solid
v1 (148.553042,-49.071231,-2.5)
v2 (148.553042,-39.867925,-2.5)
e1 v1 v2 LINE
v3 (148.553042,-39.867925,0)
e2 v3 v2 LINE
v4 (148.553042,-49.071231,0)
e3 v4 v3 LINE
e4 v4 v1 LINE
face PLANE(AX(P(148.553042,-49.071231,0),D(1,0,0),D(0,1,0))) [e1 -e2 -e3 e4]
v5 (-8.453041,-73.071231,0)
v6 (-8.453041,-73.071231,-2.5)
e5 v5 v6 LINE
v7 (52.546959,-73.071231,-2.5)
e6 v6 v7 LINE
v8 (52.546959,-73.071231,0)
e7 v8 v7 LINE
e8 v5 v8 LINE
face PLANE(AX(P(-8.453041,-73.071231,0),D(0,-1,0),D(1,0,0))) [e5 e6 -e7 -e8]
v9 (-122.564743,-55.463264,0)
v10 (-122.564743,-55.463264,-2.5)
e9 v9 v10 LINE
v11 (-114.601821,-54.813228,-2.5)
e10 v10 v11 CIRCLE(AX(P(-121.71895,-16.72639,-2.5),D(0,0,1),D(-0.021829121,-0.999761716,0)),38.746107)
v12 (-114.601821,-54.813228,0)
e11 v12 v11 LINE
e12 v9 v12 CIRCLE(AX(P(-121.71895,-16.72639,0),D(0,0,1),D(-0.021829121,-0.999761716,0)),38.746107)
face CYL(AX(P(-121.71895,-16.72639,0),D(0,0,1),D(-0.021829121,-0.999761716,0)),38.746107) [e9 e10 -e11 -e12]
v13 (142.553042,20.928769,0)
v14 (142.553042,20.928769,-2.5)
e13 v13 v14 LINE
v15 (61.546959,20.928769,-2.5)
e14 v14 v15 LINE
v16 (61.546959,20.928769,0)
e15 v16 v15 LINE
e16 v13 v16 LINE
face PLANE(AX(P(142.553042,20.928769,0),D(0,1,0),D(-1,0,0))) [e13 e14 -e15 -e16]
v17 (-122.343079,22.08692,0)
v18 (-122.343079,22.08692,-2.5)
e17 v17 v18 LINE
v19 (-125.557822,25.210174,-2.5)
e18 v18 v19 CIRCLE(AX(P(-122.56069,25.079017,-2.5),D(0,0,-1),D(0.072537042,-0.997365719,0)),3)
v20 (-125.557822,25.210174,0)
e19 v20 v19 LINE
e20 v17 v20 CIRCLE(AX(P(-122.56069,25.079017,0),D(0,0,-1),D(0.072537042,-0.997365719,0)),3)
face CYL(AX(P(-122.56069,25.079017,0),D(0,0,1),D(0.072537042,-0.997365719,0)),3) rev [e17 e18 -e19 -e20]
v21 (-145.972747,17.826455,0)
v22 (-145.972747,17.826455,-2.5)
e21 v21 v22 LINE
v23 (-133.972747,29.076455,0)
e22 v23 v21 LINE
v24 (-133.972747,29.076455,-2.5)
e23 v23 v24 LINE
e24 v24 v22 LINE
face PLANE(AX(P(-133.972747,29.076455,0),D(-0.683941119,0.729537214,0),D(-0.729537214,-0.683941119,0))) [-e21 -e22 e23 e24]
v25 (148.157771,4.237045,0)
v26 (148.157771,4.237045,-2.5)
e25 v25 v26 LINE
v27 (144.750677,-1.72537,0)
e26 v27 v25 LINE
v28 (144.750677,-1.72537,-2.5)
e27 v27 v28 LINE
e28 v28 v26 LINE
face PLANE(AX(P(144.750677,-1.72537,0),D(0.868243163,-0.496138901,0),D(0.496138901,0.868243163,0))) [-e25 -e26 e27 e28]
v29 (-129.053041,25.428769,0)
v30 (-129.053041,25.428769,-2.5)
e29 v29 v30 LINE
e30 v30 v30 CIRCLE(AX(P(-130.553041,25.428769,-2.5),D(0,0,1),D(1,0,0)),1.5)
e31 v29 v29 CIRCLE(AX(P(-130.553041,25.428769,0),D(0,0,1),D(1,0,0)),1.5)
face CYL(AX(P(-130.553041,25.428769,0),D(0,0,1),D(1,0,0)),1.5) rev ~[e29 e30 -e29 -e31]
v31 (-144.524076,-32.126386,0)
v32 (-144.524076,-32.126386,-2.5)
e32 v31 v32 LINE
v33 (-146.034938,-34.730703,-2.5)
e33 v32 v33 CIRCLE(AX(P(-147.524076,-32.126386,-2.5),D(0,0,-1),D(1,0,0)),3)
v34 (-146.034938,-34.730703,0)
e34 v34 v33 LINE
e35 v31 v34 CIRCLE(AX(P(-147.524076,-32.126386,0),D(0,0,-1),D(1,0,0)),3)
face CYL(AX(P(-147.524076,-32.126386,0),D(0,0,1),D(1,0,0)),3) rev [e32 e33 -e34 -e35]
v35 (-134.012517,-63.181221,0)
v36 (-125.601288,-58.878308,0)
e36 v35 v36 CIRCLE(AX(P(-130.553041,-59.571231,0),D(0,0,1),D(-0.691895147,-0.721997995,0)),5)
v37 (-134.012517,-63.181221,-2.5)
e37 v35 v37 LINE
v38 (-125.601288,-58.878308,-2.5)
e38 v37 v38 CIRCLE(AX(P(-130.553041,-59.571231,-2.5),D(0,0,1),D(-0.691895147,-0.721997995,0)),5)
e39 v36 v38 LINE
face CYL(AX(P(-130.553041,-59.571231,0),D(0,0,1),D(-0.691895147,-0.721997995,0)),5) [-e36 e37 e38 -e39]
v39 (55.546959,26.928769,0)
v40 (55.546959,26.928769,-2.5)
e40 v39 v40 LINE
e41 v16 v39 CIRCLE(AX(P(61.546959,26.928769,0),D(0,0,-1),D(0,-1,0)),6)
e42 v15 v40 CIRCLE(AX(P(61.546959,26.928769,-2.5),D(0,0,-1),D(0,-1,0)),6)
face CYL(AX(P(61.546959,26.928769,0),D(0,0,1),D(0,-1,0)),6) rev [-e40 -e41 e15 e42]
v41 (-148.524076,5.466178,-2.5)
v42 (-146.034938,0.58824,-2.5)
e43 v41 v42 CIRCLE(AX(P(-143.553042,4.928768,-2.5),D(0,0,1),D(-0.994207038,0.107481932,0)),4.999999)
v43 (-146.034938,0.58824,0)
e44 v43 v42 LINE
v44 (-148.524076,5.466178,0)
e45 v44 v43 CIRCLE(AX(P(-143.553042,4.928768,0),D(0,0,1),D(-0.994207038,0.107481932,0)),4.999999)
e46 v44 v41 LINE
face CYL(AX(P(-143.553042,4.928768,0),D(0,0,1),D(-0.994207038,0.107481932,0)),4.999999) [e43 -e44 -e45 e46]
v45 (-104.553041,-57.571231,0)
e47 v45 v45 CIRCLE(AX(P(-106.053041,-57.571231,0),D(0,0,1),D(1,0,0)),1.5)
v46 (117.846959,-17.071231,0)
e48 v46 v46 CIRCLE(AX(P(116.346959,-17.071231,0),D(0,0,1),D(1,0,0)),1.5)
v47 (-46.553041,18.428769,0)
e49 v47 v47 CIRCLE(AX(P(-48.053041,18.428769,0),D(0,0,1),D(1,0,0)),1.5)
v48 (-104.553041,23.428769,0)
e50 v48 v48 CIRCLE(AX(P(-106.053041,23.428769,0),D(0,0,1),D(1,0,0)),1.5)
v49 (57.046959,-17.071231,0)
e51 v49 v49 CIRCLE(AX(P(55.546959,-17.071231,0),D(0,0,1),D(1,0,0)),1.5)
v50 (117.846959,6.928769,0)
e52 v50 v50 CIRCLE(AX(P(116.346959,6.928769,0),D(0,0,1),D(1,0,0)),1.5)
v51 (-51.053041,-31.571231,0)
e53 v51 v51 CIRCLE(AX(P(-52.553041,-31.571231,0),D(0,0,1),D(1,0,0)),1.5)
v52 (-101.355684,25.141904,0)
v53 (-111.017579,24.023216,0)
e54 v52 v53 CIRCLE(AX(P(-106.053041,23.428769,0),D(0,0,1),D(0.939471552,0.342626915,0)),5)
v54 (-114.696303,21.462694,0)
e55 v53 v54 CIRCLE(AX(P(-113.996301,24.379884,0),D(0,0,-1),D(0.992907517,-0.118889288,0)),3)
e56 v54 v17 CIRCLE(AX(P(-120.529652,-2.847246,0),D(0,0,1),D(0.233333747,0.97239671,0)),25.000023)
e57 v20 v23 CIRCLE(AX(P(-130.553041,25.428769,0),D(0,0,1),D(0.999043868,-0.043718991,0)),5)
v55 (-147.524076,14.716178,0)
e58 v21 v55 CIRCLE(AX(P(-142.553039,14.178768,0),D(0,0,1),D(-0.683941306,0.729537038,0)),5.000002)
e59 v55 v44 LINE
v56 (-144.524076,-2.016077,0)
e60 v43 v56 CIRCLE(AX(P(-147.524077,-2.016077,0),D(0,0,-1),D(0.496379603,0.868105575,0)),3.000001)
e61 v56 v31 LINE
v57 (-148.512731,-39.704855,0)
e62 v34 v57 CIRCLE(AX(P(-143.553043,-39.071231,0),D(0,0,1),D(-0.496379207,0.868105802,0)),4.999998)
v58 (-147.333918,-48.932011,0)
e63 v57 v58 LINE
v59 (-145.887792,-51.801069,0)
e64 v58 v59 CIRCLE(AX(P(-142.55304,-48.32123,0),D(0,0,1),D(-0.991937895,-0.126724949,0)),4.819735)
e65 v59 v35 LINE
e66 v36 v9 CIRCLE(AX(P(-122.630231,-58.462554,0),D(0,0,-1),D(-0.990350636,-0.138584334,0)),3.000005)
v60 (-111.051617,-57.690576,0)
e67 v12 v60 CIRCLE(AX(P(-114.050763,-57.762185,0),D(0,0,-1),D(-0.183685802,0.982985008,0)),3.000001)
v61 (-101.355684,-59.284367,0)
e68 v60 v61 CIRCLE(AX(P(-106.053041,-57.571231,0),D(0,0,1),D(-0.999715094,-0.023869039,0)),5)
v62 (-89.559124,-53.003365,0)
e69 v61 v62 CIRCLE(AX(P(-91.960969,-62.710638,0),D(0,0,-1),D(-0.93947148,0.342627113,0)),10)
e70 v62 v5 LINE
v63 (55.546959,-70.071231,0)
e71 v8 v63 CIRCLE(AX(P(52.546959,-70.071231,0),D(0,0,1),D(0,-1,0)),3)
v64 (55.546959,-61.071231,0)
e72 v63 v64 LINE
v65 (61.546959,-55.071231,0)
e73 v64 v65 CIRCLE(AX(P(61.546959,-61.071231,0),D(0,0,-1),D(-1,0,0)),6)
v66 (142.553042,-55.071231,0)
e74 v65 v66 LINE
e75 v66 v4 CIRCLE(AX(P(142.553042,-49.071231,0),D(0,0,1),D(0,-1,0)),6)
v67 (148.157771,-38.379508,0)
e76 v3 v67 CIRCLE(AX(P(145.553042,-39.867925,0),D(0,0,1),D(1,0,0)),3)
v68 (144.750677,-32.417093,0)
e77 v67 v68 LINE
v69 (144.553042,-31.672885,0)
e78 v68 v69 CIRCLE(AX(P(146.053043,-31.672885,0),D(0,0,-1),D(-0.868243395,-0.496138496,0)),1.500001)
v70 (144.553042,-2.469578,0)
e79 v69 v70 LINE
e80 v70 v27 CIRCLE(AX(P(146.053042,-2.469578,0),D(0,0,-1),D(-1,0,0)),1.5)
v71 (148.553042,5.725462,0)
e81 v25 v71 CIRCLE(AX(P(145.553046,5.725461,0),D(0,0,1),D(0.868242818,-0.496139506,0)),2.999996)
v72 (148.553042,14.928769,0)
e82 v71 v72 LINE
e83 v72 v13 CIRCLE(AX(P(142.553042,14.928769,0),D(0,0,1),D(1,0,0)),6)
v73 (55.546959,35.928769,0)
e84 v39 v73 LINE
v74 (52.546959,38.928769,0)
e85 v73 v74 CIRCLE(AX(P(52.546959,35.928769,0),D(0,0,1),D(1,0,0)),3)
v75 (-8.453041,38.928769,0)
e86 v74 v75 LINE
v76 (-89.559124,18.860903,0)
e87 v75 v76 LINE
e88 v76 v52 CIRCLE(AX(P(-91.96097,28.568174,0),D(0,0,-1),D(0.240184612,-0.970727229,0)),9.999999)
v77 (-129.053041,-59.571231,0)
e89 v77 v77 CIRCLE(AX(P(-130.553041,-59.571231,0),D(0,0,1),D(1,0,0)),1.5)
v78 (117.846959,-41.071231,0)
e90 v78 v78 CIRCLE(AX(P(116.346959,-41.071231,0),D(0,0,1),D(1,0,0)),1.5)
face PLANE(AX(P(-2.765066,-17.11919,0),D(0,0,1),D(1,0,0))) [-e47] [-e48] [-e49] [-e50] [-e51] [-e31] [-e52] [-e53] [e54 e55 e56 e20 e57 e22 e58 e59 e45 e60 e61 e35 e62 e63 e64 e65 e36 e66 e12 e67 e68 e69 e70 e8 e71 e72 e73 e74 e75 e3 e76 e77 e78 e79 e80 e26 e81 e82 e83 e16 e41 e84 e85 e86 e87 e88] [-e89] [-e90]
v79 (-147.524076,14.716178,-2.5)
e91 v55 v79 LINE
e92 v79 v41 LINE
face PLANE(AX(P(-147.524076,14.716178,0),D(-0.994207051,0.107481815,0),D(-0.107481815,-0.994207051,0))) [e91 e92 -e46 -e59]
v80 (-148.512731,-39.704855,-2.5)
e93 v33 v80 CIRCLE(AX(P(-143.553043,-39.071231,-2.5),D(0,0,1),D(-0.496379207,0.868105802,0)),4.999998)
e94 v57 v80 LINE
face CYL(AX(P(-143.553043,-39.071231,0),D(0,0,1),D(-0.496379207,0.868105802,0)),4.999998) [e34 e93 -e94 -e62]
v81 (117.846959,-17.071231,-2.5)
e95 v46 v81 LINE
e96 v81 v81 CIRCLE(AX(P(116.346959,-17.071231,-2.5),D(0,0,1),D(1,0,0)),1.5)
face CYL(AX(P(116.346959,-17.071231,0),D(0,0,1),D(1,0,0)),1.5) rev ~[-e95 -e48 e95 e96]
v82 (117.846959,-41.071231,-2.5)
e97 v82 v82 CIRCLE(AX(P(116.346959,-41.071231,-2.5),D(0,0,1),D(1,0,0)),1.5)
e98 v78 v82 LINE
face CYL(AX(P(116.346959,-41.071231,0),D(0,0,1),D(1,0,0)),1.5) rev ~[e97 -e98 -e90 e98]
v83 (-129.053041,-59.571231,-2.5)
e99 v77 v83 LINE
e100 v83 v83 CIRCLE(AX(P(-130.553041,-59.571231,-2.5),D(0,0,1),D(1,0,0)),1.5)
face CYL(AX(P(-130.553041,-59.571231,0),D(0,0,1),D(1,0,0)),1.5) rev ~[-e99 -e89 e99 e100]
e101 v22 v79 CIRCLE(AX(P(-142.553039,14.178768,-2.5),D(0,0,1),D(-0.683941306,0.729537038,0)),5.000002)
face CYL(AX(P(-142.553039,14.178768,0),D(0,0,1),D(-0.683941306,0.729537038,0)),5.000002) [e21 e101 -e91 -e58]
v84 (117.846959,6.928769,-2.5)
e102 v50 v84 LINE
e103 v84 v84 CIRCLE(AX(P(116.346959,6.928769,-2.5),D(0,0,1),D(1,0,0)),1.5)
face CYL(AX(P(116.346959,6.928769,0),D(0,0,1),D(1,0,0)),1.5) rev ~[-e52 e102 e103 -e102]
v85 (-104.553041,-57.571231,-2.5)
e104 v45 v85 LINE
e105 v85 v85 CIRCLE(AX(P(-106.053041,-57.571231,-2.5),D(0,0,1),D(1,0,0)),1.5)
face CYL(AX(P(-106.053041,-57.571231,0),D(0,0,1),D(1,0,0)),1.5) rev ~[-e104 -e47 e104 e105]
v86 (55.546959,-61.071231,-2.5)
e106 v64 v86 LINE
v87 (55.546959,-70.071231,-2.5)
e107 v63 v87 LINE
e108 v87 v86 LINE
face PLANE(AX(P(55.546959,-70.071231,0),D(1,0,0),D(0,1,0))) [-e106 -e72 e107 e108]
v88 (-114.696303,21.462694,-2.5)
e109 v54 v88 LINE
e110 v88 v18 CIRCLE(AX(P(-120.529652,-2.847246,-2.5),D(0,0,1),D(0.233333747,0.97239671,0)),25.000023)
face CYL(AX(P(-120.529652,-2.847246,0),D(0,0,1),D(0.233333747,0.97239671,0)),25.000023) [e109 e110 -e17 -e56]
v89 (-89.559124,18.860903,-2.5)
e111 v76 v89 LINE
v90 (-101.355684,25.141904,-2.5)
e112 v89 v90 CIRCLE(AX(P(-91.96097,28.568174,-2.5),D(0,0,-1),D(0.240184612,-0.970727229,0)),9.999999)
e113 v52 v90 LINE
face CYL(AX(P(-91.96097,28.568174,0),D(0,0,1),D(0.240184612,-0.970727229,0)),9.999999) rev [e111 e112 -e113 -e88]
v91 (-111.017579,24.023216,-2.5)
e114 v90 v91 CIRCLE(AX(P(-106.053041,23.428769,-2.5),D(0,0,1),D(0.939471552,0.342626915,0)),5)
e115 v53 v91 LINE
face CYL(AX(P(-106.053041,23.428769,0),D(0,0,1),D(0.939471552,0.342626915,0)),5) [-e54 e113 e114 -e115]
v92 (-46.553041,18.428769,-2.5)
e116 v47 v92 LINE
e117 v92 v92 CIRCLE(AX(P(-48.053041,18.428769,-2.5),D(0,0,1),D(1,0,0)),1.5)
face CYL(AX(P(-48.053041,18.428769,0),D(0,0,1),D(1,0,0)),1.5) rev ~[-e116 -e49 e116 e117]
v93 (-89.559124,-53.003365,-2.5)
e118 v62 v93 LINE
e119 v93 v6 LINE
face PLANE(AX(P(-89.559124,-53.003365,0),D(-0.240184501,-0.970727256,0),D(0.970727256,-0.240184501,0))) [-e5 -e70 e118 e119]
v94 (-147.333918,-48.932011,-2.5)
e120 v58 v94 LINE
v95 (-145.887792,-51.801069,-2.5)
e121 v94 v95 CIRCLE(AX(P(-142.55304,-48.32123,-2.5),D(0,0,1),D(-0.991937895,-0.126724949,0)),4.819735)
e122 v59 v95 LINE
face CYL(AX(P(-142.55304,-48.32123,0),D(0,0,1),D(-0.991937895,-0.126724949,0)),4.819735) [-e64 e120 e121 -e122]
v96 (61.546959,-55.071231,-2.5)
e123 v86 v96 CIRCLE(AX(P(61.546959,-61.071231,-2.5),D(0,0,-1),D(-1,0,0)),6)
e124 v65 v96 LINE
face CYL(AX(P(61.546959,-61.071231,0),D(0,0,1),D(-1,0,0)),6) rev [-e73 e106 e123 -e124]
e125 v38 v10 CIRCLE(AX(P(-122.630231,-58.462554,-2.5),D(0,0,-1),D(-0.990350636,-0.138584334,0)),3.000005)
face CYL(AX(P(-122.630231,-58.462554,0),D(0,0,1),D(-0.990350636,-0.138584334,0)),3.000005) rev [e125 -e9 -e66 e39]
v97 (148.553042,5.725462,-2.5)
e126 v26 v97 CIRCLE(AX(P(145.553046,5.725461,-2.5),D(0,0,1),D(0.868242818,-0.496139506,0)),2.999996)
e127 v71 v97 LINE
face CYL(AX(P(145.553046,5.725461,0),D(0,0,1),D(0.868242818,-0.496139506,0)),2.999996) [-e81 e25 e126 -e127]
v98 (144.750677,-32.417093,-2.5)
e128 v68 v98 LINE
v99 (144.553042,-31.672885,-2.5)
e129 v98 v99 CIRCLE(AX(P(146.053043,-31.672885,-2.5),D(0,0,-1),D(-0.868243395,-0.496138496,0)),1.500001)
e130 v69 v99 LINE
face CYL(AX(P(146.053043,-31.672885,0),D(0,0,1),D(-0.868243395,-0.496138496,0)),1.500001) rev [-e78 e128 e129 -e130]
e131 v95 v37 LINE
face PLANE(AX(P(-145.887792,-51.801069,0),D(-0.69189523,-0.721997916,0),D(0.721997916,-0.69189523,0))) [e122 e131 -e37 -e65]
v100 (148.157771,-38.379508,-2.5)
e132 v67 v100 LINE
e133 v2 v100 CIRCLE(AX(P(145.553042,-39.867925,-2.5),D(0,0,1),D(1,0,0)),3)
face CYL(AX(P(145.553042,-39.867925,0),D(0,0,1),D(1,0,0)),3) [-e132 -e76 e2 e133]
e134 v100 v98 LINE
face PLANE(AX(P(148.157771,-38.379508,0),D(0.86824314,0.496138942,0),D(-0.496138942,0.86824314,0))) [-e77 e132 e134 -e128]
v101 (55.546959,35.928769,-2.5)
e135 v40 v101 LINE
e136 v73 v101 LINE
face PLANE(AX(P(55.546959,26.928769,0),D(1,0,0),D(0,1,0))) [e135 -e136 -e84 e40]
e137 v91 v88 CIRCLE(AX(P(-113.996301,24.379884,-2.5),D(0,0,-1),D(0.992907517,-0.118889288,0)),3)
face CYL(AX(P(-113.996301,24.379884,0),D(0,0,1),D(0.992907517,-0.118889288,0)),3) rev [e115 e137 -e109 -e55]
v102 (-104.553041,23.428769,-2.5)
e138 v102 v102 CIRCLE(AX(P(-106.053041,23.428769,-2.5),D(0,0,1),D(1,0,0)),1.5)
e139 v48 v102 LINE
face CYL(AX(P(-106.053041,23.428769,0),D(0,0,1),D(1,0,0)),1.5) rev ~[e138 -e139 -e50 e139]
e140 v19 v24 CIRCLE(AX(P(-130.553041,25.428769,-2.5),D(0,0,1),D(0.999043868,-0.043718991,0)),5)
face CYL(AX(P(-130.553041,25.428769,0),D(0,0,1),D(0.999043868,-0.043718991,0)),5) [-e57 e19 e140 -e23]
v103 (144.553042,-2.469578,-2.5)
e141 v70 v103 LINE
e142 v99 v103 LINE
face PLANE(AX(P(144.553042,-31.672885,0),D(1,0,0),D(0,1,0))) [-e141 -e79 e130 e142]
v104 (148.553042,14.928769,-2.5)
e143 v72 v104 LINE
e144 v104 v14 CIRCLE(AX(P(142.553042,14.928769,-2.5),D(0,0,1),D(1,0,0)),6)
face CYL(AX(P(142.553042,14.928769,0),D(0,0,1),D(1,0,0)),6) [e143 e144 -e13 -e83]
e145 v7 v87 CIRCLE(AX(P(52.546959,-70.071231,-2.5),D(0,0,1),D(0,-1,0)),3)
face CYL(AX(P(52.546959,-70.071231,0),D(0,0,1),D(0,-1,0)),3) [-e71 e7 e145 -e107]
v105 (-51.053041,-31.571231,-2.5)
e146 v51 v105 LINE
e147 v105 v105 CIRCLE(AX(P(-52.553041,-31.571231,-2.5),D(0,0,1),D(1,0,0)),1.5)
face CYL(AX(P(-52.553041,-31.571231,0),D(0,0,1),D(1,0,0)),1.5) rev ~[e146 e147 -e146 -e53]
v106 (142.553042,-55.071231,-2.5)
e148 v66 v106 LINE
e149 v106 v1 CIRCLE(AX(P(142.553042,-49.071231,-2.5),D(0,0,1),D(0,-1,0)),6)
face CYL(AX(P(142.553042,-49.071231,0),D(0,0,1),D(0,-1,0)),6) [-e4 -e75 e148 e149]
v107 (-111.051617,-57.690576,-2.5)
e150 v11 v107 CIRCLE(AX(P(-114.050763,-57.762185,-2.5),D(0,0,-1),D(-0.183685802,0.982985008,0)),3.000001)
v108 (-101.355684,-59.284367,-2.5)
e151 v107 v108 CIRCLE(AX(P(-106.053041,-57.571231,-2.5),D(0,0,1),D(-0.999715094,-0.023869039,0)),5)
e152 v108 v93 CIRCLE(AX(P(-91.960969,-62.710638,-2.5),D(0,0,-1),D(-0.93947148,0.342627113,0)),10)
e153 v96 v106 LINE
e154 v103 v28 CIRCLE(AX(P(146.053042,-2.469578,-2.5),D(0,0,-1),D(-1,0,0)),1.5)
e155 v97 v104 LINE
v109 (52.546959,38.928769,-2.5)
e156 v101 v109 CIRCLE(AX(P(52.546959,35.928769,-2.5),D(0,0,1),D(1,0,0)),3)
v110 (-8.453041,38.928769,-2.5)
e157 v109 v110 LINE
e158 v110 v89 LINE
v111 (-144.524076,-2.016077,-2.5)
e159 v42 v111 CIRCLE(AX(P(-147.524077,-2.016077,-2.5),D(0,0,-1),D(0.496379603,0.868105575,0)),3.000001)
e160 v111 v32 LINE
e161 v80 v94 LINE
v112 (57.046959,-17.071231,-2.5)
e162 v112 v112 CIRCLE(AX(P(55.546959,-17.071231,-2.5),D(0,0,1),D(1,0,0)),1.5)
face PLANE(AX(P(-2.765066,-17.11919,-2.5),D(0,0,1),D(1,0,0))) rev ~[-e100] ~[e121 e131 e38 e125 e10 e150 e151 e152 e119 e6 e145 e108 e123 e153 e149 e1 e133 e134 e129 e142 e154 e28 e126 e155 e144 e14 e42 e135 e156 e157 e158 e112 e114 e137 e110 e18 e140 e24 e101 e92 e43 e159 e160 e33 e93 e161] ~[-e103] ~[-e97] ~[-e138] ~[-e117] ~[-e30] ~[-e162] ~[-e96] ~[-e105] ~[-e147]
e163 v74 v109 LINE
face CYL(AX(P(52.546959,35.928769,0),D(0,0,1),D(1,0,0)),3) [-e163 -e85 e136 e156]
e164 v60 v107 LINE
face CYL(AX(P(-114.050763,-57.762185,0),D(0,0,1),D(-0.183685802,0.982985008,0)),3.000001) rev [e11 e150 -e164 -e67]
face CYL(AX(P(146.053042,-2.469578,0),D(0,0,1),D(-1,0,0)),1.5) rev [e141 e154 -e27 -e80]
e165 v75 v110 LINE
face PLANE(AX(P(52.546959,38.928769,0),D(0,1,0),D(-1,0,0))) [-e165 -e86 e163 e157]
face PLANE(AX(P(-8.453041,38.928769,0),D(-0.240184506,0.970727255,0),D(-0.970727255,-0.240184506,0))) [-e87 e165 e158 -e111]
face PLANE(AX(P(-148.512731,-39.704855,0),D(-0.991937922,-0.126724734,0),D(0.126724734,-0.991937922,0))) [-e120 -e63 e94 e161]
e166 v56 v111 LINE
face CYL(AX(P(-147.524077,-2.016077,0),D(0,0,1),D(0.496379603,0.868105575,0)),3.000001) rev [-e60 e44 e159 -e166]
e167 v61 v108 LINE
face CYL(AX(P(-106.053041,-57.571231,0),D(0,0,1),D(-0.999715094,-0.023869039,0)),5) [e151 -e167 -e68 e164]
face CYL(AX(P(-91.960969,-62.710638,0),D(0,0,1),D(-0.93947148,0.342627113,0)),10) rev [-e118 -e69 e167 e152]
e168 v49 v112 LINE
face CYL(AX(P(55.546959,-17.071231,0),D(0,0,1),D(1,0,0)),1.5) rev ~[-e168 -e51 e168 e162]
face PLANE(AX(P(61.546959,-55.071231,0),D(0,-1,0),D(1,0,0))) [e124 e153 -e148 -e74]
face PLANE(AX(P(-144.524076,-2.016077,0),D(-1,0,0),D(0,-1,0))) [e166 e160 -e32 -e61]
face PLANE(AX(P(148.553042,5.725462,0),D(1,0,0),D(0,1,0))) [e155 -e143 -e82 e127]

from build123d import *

# Parameters (mm, degrees)
F0_R     = 1.5
F1_DEPTH = 2.5


# Not quite as in the source:
# - ends of sketch curves that miss each other by under 0.0002 mm in the source are joined


with BuildPart() as f1:
    # F0 (on Top) → F1 (new body)
    with BuildSketch(Plane.XY):
        with BuildLine():
            ThreePointArc((148.553042, 14.928769), (146.7956826871, 19.1714096871), (142.553042, 20.928769))
            Line((142.553042, 20.928769), (61.546959, 20.928769))
            ThreePointArc((61.546959, 20.928769), (57.3043183129, 22.6861283129), (55.546959, 26.928769))
            Line((55.546959, 26.928769), (55.546959, 35.928769))
            ThreePointArc((55.546959, 35.928769), (54.6682793436, 38.0500893436), (52.546959, 38.928769))
            Line((52.546959, 38.928769), (-8.453041, 38.928769))
            Line((-8.453041, 38.928769), (-89.559124, 18.860903))
            ThreePointArc((-89.559124, 18.860903), (-96.6607350116, 19.7413862614), (-101.3556837465, 25.1419037277))
            ThreePointArc((-101.3556837465, 25.1419037277), (-106.6281165379, 28.3955877128), (-111.0175785103, 24.0232160611))
            ThreePointArc((-111.0175785103, 24.0232160611), (-112.2824719314, 21.9176106757), (-114.6963029885, 21.462694048))
            ThreePointArc((-114.6963029885, 21.462694048), (-118.4956024313, 22.0698924501), (-122.3430789933, 22.0869199077))
            ThreePointArc((-122.3430789933, 22.0869199077), (-124.651171475, 22.9272997317), (-125.557821603, 25.2101739826))
            ThreePointArc((-125.557821603, 25.2101739826), (-128.4655562478, 29.9721606196), (-133.972746844, 29.0764548336))
            Line((-133.972746844, 29.0764548336), (-145.972747, 17.826455))
            ThreePointArc((-145.972747, 17.826455), (-147.027366593, 16.4104523305), (-147.524076258, 14.7161780279))
            Line((-147.524076258, 14.7161780279), (-148.524076, 5.466178))
            ThreePointArc((-148.524076, 5.466178), (-148.0067044123, 2.6561312792), (-146.0349377658, 0.5882404096))
            ThreePointArc((-146.0349377658, 0.5882404096), (-144.929137249, -0.5106558369), (-144.524076, -2.016077))
            Line((-144.524076, -2.016077), (-144.524076, -32.126386))
            ThreePointArc((-144.524076, -32.126386), (-144.929137249, -33.6318071631), (-146.0349379189, -34.7307031419))
            ThreePointArc((-146.0349379189, -34.7307031419), (-148.0285132018, -36.8418479978), (-148.5127305604, -39.7048550716))
            Line((-148.5127305604, -39.7048550716), (-147.333918, -48.932011))
            ThreePointArc((-147.333918, -48.932011), (-146.8569609625, -50.4905877681), (-145.8877919349, -51.801068932))
            Line((-145.8877919349, -51.801068932), (-134.012517, -63.181221))
            ThreePointArc((-134.012517, -63.181221), (-128.2758744449, -64.0225805122), (-125.6012880056, -58.8783080008))
            ThreePointArc((-125.6012880056, -58.8783080008), (-124.8721529677, -56.4691107751), (-122.564742997, -55.4632638637))
            ThreePointArc((-122.564742997, -55.4632638637), (-118.5664827026, -55.3440377294), (-114.6018211423, -54.8132282387))
            ThreePointArc((-114.6018211423, -54.8132282387), (-112.1618303627, -55.4315323166), (-111.051616739, -57.6905760176))
            ThreePointArc((-111.051616739, -57.6905760176), (-106.8640436675, -62.5050200787), (-101.3556836703, -59.2843667555))
            ThreePointArc((-101.3556836703, -59.2843667555), (-96.6607350116, -53.8838492614), (-89.5591238689, -53.0033654703))
            Line((-89.5591238689, -53.0033654703), (-8.453041, -73.071231))
            Line((-8.453041, -73.071231), (52.546959, -73.071231))
            ThreePointArc((52.546959, -73.071231), (54.6682793436, -72.1925513436), (55.546959, -70.071231))
            Line((55.546959, -70.071231), (55.546959, -61.071231))
            ThreePointArc((55.546959, -61.071231), (57.3043183129, -56.8285903129), (61.546959, -55.071231))
            Line((61.546959, -55.071231), (142.553042, -55.071231))
            ThreePointArc((142.553042, -55.071231), (146.7956826871, -53.3138716871), (148.553042, -49.071231))
            Line((148.553042, -49.071231), (148.553042, -39.867925))
            ThreePointArc((148.553042, -39.867925), (148.4525408985, -39.0979210147), (148.1577712418, -38.3795078619))
            Line((148.1577712418, -38.3795078619), (144.750677, -32.417093))
            ThreePointArc((144.750677, -32.417093), (144.6032924632, -32.057886663), (144.553042, -31.672885))
            Line((144.553042, -31.672885), (144.553042, -2.469578))
            ThreePointArc((144.553042, -2.469578), (144.6032924632, -2.084576337), (144.7506770407, -1.7253700232))
            Line((144.7506770407, -1.7253700232), (148.157771, 4.237045))
            ThreePointArc((148.157771, 4.237045), (148.4525408985, 4.9554580147), (148.553042, 5.725462))
            Line((148.553042, 5.725462), (148.553042, 14.928769))
        make_face()
        with Locations((-130.553041, -59.571231)):
            Circle(F0_R, mode=Mode.SUBTRACT)
        with Locations((-106.053041, -57.571231)):
            Circle(F0_R, mode=Mode.SUBTRACT)
        with Locations((-52.553041, -31.571231)):
            Circle(F0_R, mode=Mode.SUBTRACT)
        with Locations((116.346959, -41.071231)):
            Circle(F0_R, mode=Mode.SUBTRACT)
        with Locations((-106.053041, 23.428769)):
            Circle(F0_R, mode=Mode.SUBTRACT)
        with Locations((-130.553041, 25.428769)):
            Circle(F0_R, mode=Mode.SUBTRACT)
        with Locations((-48.053041, 18.428769)):
            Circle(F0_R, mode=Mode.SUBTRACT)
        with Locations((55.546959, -17.071231)):
            Circle(F0_R, mode=Mode.SUBTRACT)
        with Locations((116.346959, -17.071231)):
            Circle(F0_R, mode=Mode.SUBTRACT)
        with Locations((116.346959, 6.928769)):
            Circle(F0_R, mode=Mode.SUBTRACT)
    extrude(amount=-F1_DEPTH)


solid = f1.part
